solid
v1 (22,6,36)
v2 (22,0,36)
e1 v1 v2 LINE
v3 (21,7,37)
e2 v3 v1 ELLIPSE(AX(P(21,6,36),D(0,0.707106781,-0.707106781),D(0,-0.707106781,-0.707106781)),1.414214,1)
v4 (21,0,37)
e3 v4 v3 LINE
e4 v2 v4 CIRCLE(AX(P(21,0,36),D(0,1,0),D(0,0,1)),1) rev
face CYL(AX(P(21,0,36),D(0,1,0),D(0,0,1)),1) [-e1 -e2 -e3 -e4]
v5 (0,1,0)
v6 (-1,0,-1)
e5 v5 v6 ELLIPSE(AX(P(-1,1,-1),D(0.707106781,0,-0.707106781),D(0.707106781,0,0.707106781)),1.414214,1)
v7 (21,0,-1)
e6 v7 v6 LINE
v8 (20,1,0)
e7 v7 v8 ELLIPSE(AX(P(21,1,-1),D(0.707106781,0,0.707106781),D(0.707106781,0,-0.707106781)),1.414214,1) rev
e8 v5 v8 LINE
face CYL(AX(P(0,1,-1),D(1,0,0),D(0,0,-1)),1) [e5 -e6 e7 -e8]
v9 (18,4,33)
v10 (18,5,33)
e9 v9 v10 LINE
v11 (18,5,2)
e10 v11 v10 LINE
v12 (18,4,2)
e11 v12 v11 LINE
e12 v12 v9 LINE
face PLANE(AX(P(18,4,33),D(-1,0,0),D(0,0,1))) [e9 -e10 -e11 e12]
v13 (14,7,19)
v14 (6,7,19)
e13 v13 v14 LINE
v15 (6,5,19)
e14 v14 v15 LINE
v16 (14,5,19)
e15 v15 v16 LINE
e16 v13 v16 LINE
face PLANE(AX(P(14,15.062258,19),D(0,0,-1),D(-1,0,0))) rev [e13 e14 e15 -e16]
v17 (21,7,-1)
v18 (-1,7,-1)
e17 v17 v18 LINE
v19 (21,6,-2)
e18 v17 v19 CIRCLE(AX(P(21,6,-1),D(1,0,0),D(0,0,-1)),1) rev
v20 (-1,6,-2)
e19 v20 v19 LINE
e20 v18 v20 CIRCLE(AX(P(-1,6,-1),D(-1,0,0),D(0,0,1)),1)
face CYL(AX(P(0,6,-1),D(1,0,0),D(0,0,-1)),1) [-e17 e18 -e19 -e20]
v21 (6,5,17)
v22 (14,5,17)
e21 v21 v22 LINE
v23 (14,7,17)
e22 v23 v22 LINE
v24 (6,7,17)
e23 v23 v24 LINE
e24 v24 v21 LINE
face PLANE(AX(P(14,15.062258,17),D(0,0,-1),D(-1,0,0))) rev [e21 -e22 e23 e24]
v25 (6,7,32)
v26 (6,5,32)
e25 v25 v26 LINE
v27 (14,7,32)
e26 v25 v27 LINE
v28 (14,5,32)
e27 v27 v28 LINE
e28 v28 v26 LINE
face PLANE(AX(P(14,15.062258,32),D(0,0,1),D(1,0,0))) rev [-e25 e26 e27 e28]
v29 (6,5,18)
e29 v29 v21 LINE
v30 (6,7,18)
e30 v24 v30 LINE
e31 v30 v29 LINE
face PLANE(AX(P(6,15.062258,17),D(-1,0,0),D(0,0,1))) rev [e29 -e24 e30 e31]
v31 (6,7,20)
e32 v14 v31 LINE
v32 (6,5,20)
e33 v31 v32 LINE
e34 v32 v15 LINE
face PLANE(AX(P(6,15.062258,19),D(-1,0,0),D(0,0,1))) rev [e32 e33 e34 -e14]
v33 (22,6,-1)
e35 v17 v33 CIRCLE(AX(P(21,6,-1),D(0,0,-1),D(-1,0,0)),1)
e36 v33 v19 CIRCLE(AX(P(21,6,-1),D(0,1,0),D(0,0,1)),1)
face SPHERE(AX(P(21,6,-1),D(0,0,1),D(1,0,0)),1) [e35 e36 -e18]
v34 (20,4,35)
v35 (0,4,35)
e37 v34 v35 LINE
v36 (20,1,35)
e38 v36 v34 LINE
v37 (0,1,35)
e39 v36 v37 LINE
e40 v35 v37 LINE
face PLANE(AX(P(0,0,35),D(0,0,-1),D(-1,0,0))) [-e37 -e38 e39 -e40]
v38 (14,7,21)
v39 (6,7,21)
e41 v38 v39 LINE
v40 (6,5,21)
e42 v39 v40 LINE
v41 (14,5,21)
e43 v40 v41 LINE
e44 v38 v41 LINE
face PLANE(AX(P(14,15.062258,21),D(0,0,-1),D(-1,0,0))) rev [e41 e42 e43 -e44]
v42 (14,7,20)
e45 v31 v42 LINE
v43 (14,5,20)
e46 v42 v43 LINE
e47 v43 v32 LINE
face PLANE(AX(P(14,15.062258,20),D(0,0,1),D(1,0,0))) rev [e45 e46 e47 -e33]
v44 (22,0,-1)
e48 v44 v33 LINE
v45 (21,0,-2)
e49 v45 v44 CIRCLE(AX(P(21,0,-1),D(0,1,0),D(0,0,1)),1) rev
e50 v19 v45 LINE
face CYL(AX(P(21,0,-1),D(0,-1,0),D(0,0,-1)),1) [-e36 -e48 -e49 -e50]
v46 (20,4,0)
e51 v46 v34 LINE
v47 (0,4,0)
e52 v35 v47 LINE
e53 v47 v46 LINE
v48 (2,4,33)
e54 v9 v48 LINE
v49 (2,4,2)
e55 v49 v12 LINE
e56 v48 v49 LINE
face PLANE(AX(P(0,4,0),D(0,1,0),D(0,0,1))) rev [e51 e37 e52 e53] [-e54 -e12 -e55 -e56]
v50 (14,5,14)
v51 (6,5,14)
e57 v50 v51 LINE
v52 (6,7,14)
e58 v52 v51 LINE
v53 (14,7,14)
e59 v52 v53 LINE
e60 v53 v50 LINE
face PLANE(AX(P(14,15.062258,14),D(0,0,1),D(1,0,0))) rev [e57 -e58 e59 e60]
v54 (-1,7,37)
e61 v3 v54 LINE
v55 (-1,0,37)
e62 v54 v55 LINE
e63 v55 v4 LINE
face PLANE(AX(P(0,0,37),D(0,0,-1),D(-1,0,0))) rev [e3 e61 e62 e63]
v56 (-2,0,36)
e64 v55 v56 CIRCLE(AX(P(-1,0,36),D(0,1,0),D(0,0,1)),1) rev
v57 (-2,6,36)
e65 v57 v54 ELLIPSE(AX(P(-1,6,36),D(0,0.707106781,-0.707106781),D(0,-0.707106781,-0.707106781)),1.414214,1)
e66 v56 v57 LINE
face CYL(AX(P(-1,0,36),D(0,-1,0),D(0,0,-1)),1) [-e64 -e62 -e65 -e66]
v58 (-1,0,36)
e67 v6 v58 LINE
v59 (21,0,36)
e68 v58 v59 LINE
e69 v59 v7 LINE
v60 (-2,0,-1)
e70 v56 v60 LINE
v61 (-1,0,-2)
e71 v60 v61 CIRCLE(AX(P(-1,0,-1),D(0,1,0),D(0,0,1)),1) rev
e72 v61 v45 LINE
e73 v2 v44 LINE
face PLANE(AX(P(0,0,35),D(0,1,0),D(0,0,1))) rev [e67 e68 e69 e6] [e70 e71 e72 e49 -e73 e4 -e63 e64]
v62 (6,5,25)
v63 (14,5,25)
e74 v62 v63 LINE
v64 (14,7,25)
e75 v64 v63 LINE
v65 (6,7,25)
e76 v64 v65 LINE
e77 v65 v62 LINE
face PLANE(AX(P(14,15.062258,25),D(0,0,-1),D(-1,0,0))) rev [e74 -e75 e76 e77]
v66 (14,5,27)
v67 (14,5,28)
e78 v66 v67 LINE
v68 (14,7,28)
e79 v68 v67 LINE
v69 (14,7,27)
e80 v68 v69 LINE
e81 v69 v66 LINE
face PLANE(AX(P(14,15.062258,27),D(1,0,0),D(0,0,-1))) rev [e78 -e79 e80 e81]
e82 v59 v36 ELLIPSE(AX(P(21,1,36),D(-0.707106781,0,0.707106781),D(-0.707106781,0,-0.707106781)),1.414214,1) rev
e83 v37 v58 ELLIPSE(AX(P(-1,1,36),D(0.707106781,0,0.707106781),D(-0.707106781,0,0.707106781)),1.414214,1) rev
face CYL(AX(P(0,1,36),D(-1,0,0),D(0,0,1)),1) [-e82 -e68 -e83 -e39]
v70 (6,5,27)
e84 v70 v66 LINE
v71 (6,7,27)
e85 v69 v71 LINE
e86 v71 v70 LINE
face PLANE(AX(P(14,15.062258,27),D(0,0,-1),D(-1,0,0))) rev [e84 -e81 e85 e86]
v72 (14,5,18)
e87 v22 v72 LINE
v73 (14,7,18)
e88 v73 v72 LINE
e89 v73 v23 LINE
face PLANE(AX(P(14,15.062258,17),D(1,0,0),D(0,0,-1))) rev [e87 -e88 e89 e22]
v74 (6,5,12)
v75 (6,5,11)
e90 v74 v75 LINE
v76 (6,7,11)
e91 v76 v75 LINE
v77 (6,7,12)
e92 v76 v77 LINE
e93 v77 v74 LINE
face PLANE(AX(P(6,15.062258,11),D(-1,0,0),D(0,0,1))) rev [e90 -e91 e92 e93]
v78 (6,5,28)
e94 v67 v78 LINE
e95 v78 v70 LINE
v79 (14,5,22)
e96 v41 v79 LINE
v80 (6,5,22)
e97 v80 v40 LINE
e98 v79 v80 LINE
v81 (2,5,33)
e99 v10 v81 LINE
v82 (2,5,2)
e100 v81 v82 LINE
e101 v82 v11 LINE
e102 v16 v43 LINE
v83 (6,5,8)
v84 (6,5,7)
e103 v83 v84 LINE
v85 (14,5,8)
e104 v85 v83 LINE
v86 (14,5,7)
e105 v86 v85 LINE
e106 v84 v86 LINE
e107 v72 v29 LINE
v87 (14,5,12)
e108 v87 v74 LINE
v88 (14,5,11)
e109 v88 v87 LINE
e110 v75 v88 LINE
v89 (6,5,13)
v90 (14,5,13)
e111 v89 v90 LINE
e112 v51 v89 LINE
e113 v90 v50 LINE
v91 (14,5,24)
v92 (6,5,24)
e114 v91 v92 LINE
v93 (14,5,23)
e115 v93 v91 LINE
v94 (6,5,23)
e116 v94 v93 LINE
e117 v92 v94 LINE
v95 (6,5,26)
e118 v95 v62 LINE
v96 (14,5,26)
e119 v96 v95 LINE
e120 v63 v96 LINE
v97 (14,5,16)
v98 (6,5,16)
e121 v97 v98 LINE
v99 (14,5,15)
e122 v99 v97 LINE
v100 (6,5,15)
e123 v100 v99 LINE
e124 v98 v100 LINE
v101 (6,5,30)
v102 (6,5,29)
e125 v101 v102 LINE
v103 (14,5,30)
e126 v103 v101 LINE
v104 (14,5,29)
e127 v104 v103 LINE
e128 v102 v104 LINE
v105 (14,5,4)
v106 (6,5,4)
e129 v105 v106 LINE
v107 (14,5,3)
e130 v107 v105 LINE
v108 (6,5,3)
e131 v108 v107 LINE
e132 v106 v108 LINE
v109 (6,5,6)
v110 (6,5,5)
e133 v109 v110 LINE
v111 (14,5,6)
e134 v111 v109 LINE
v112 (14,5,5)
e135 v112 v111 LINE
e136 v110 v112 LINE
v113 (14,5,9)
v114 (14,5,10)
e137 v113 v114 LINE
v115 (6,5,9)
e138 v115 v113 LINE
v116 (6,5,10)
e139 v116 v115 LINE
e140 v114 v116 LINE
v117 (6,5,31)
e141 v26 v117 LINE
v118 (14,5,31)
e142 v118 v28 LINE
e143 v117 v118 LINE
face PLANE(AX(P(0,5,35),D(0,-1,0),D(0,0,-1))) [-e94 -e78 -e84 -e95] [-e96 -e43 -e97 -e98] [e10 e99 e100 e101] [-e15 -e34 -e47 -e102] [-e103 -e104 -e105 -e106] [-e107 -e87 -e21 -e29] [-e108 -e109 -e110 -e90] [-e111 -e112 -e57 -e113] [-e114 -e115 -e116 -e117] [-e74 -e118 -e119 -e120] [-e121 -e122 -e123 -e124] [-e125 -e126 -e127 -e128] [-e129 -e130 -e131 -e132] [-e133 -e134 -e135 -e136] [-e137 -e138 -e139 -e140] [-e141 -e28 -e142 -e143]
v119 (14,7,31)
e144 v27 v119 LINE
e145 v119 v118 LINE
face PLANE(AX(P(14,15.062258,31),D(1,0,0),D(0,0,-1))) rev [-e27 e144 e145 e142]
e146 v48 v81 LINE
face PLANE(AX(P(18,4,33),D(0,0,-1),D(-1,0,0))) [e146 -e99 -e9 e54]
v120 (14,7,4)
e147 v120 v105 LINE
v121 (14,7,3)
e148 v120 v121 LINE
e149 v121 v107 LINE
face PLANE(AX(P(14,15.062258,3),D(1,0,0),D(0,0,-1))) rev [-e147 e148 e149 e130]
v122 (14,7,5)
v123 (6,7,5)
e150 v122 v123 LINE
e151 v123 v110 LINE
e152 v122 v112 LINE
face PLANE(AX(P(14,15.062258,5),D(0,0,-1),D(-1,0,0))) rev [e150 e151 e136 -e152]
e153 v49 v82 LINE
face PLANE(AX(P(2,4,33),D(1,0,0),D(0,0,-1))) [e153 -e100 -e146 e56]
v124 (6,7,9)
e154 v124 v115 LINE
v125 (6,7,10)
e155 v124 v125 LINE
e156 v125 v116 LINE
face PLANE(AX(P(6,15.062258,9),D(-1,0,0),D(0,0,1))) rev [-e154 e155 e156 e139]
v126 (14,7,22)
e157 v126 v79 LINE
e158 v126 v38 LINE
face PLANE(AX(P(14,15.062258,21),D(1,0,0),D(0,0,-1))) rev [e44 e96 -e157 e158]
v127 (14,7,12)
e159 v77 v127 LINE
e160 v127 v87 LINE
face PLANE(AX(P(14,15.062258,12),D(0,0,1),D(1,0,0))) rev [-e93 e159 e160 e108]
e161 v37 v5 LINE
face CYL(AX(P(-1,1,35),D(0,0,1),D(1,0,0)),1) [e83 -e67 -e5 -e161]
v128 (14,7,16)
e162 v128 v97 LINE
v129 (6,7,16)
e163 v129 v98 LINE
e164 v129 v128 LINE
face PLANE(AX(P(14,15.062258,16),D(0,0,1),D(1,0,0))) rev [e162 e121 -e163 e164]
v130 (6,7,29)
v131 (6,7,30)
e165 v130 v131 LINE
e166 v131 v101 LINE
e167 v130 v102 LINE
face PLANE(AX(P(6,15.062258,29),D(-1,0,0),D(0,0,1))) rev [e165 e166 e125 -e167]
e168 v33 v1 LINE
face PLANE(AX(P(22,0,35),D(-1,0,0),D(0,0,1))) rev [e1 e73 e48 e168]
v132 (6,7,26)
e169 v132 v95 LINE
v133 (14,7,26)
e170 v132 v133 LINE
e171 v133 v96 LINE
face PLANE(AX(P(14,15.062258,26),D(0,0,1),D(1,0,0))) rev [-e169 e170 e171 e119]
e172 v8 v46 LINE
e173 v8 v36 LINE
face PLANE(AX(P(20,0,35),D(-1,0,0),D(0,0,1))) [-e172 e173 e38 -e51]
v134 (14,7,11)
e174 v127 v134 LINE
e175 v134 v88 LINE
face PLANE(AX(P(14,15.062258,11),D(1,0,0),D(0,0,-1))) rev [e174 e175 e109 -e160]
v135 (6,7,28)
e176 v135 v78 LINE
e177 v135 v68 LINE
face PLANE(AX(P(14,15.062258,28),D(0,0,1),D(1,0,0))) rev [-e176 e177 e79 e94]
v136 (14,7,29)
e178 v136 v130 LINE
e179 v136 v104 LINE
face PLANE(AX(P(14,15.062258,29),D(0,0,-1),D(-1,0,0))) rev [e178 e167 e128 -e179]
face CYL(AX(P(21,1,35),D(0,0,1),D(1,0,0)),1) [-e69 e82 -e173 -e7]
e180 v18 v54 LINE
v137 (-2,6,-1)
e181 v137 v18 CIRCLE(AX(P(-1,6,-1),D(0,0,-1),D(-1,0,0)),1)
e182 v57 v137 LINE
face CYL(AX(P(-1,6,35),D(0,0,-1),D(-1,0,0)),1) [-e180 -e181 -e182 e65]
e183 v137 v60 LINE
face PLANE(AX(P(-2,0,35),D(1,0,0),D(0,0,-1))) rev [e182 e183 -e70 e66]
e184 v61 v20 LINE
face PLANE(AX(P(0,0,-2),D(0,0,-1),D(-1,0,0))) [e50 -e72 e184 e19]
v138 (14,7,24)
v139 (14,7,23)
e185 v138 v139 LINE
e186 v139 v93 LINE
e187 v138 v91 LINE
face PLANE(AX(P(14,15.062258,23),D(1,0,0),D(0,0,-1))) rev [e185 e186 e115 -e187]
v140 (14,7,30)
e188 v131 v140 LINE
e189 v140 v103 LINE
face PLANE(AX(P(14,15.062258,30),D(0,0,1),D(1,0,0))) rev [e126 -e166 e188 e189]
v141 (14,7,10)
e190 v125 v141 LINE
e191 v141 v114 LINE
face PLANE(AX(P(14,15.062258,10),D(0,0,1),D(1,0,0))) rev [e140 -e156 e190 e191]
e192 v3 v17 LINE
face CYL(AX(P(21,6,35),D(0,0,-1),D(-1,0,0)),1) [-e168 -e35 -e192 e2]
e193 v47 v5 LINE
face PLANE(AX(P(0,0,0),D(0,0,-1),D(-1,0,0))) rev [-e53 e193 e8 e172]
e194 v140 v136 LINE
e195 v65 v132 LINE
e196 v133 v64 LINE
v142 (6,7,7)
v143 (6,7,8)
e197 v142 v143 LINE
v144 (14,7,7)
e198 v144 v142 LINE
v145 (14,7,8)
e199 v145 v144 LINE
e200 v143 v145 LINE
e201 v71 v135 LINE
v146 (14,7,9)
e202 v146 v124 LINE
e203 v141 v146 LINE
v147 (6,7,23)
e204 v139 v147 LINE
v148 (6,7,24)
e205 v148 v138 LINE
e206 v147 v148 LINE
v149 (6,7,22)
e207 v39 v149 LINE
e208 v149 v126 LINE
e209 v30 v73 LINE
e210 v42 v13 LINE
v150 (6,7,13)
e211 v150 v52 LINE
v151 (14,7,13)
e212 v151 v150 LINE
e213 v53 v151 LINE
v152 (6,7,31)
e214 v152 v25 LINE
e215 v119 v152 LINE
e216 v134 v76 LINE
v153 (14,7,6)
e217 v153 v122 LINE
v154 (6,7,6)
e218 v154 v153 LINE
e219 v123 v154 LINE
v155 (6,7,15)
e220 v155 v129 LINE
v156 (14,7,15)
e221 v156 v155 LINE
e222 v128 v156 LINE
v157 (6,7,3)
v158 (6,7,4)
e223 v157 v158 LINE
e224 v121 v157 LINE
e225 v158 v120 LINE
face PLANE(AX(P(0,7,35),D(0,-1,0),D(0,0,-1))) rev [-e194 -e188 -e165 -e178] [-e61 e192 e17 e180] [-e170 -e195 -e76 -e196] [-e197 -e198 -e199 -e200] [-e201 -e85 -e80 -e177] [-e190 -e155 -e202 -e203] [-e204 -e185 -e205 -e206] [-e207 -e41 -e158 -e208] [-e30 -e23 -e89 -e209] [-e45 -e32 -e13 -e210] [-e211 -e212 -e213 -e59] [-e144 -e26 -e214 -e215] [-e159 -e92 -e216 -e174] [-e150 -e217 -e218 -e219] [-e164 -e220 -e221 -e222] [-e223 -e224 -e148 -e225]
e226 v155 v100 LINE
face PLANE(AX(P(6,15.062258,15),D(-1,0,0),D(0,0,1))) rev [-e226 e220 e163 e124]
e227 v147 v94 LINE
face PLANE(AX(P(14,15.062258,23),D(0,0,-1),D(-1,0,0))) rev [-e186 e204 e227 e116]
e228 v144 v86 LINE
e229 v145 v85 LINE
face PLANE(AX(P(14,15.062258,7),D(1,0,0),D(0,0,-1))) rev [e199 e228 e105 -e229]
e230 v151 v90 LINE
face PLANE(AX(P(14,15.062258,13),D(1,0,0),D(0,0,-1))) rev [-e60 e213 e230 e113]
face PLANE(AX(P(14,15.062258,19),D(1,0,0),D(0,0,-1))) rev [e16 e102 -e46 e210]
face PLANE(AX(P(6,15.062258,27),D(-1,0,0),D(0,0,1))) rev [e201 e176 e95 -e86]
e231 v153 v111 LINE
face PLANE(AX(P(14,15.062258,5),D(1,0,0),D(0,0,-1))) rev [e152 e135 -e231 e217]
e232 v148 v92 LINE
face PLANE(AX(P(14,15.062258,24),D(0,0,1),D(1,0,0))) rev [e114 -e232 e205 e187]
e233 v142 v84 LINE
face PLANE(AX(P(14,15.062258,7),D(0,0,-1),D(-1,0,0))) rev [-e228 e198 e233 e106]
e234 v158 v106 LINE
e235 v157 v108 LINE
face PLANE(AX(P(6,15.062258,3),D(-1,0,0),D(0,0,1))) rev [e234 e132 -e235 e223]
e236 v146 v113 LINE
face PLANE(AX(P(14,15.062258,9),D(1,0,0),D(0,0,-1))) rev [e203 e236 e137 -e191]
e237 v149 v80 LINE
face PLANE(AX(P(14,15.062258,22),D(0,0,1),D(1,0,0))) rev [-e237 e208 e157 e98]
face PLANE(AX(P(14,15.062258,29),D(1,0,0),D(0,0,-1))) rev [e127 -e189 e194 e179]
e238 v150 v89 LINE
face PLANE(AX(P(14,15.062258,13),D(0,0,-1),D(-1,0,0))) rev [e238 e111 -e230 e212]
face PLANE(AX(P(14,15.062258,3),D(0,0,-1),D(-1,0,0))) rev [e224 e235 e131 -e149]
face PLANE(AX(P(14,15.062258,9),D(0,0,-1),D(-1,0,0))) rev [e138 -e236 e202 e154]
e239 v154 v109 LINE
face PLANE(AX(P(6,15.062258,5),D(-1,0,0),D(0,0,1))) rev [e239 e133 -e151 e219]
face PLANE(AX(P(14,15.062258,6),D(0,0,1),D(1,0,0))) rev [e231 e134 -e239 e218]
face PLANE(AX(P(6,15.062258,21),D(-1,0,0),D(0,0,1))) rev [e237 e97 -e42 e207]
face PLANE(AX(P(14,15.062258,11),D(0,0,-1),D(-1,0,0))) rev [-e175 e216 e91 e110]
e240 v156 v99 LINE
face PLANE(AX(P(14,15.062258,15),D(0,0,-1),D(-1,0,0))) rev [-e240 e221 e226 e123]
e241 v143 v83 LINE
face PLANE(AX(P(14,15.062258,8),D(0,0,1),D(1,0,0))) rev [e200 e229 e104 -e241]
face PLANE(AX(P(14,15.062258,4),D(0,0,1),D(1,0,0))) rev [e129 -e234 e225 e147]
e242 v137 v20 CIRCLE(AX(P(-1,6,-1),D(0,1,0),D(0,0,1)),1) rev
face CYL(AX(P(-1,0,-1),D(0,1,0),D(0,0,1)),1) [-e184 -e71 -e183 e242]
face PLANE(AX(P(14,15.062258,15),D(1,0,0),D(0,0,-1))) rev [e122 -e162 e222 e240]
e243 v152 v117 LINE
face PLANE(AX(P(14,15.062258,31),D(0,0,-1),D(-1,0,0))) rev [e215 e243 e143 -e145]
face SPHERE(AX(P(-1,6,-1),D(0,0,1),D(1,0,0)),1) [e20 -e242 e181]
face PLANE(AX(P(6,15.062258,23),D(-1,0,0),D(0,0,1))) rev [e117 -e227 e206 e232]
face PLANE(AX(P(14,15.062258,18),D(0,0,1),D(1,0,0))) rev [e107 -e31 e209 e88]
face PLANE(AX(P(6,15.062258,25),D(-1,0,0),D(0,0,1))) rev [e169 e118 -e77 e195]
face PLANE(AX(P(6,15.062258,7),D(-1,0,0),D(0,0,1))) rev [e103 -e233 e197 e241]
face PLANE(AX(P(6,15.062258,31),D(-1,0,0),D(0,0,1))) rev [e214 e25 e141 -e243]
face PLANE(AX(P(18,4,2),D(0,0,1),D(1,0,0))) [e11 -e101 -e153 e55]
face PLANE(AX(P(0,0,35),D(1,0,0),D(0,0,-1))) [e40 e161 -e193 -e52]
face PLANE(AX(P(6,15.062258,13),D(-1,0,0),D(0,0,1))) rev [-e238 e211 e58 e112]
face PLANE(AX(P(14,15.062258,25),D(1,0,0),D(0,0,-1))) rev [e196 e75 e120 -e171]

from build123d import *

# Parameters (mm, degrees)
SKIZZE1_W                       = 20
SKIZZE1_H                       = 5
AUFSATZ_LINEAR_AUSTRAGEN1_DEPTH = 35
WANDUNG1_T                      = 2
VERRUNDUNG1_R                   = 1
VERRUNDUNG3_R                   = 1
SKIZZE6_W                       = 20
SKIZZE6_H                       = 35
SKIZZE6_W_2                     = 16
SKIZZE6_H_2                     = 31
AUFSATZ_LINEAR_AUSTRAGEN2_DEPTH = 1
SKIZZE7_W                       = 8
SKIZZE7_H                       = 1
SCHNITT_LINEAR_AUSTRAGEN1_DEPTH = 2
LINEARES_MUSTER1_COUNT          = 8
LINEARES_MUSTER1_PITCH          = 2
LINEARES_MUSTER1_COL_COUNT      = 8
LINEARES_MUSTER1_COL_PITCH      = 2


with BuildPart() as part:
    # Skizze1 → Aufsatz-Linear austragen1 (new body)
    with BuildSketch(Plane.XY):
        with Locations((10, 2.5)):
            Rectangle(SKIZZE1_W, SKIZZE1_H)
    extrude(amount=AUFSATZ_LINEAR_AUSTRAGEN1_DEPTH)

    # Wandung1
    wandung1_openings = [part.faces().sort_by_distance(p)[0] for p in [
        (10, 0, 17.5),
    ]]
    offset(amount=WANDUNG1_T, openings=wandung1_openings, kind=Kind.INTERSECTION)

    # Verrundung1
    # the kernel refuses this fillet: 1 mm, written as the material it takes off along each edge
    with BuildSketch(Plane(origin=(21, 6, -1), x_dir=(1, 0, 0), z_dir=(0, 0, -1))) as verrundung1_piece_1_section:
        Polygon((0, 0), (VERRUNDUNG1_R, 0), (VERRUNDUNG1_R, -VERRUNDUNG1_R), (0, -VERRUNDUNG1_R), align=None)
    verrundung1_piece_1 = extrude(amount=VERRUNDUNG1_R, mode=Mode.PRIVATE)
    verrundung1_piece_1 = verrundung1_piece_1 - Plane(origin=(21, 6, -1), x_dir=(-0.7071067811865475, -0.7071067811865475, 0), z_dir=(0, 0, -1)) * Sphere(VERRUNDUNG1_R, mode=Mode.PRIVATE)
    add(verrundung1_piece_1, mode=Mode.SUBTRACT)
    with BuildSketch(Plane(origin=(-1, 6, -1), x_dir=(0, 0, -1), z_dir=(-1, 0, 0))) as verrundung1_piece_2_section:
        Polygon((0, 0), (VERRUNDUNG1_R, 0), (VERRUNDUNG1_R, -VERRUNDUNG1_R), (0, -VERRUNDUNG1_R), align=None)
    verrundung1_piece_2 = extrude(amount=VERRUNDUNG1_R, mode=Mode.PRIVATE)
    verrundung1_piece_2 = verrundung1_piece_2 - Plane(origin=(-1, 6, -1), x_dir=(0, -0.7071067811865475, 0.7071067811865475), z_dir=(-1, 0, 0)) * Sphere(VERRUNDUNG1_R, mode=Mode.PRIVATE)
    add(verrundung1_piece_2, mode=Mode.SUBTRACT)
    with BuildSketch(Plane(origin=(22, -2.5, 37), x_dir=(0, 0, -1), z_dir=(0, 1, 0)), Plane(origin=(-2, 9.5, 37), x_dir=(0, 0, -1), z_dir=(0, -1, 0))) as verrundung1_piece_3:
        with BuildLine():
            CenterArc((VERRUNDUNG1_R, VERRUNDUNG1_R), VERRUNDUNG1_R, 180, 90)
            Line((0, VERRUNDUNG1_R), (0, 0))
            Line((0, 0), (VERRUNDUNG1_R, 0))
        make_face()
    extrude(amount=12, mode=Mode.SUBTRACT)
    with BuildSketch(Plane(origin=(21, 7, -2), x_dir=(0, 0, 1), z_dir=(-1, 0, 0))) as verrundung1_piece_4:
        with BuildLine():
            CenterArc((VERRUNDUNG1_R, -VERRUNDUNG1_R), VERRUNDUNG1_R, 90, 90)
            Line((0, -VERRUNDUNG1_R), (0, 0))
            Line((0, 0), (VERRUNDUNG1_R, 0))
        make_face()
    extrude(amount=22, mode=Mode.SUBTRACT)
    with BuildSketch(Plane(origin=(22, -2.5, -2), x_dir=(0, 0, 1), z_dir=(0, 1, 0)), Plane(origin=(-2, 6, -2), x_dir=(0, 0, 1), z_dir=(0, -1, 0))) as verrundung1_piece_5:
        with BuildLine():
            CenterArc((VERRUNDUNG1_R, -VERRUNDUNG1_R), VERRUNDUNG1_R, 90, 90)
            Line((0, -VERRUNDUNG1_R), (0, 0))
            Line((0, 0), (VERRUNDUNG1_R, 0))
        make_face()
    extrude(amount=8.5, mode=Mode.SUBTRACT)
    with BuildSketch(Plane(origin=(-2, 7, -1), x_dir=(1, 0, 0), z_dir=(0, 0, 1)), Plane(origin=(22, 7, -1), x_dir=(0, -1, 0), z_dir=(0, 0, 1))) as verrundung1_piece_6:
        with BuildLine():
            CenterArc((VERRUNDUNG1_R, -VERRUNDUNG1_R), VERRUNDUNG1_R, 90, 90)
            Line((0, -VERRUNDUNG1_R), (0, 0))
            Line((0, 0), (VERRUNDUNG1_R, 0))
        make_face()
    extrude(amount=40.5, mode=Mode.SUBTRACT)

    # Verrundung3
    verrundung3_edges = [part.edges().sort_by_distance(p)[0] for p in [
        (10, 0, 0),
        (0, 0, 17.5),
        (20, 0, 17.5),
        (10, 0, 35),
    ]]
    fillet(verrundung3_edges, radius=VERRUNDUNG3_R)

    # Skizze6 → Aufsatz-Linear austragen2 (add)
    with BuildSketch(Plane.XZ.offset(-5)):
        with Locations((10, 17.5)):
            Rectangle(SKIZZE6_W, SKIZZE6_H)
        with Locations((10, 17.5)):
            Rectangle(SKIZZE6_W_2, SKIZZE6_H_2, mode=Mode.SUBTRACT)
    extrude(amount=AUFSATZ_LINEAR_AUSTRAGEN2_DEPTH)

    # Skizze7 → Schnitt-Linear austragen1 (cut)
    with BuildSketch(Plane.XZ.offset(-5)):
        with Locations((10, 17.5)):
            Rectangle(SKIZZE7_W, SKIZZE7_H)
    schnitt_linear_austragen1 = extrude(amount=-SCHNITT_LINEAR_AUSTRAGEN1_DEPTH, mode=Mode.SUBTRACT)

    # Lineares Muster1: Schnitt-Linear austragen1 ×8
    with Locations(*[(0, 0, -i * LINEARES_MUSTER1_PITCH) for i in range(1, LINEARES_MUSTER1_COUNT)]):
        add(schnitt_linear_austragen1, mode=Mode.SUBTRACT)

    # Lineares Muster1 col: Schnitt-Linear austragen1 ×8
    with Locations(*[(0, 0, i * LINEARES_MUSTER1_COL_PITCH) for i in range(1, LINEARES_MUSTER1_COL_COUNT)]):
        add(schnitt_linear_austragen1, mode=Mode.SUBTRACT)


solid = part.part
